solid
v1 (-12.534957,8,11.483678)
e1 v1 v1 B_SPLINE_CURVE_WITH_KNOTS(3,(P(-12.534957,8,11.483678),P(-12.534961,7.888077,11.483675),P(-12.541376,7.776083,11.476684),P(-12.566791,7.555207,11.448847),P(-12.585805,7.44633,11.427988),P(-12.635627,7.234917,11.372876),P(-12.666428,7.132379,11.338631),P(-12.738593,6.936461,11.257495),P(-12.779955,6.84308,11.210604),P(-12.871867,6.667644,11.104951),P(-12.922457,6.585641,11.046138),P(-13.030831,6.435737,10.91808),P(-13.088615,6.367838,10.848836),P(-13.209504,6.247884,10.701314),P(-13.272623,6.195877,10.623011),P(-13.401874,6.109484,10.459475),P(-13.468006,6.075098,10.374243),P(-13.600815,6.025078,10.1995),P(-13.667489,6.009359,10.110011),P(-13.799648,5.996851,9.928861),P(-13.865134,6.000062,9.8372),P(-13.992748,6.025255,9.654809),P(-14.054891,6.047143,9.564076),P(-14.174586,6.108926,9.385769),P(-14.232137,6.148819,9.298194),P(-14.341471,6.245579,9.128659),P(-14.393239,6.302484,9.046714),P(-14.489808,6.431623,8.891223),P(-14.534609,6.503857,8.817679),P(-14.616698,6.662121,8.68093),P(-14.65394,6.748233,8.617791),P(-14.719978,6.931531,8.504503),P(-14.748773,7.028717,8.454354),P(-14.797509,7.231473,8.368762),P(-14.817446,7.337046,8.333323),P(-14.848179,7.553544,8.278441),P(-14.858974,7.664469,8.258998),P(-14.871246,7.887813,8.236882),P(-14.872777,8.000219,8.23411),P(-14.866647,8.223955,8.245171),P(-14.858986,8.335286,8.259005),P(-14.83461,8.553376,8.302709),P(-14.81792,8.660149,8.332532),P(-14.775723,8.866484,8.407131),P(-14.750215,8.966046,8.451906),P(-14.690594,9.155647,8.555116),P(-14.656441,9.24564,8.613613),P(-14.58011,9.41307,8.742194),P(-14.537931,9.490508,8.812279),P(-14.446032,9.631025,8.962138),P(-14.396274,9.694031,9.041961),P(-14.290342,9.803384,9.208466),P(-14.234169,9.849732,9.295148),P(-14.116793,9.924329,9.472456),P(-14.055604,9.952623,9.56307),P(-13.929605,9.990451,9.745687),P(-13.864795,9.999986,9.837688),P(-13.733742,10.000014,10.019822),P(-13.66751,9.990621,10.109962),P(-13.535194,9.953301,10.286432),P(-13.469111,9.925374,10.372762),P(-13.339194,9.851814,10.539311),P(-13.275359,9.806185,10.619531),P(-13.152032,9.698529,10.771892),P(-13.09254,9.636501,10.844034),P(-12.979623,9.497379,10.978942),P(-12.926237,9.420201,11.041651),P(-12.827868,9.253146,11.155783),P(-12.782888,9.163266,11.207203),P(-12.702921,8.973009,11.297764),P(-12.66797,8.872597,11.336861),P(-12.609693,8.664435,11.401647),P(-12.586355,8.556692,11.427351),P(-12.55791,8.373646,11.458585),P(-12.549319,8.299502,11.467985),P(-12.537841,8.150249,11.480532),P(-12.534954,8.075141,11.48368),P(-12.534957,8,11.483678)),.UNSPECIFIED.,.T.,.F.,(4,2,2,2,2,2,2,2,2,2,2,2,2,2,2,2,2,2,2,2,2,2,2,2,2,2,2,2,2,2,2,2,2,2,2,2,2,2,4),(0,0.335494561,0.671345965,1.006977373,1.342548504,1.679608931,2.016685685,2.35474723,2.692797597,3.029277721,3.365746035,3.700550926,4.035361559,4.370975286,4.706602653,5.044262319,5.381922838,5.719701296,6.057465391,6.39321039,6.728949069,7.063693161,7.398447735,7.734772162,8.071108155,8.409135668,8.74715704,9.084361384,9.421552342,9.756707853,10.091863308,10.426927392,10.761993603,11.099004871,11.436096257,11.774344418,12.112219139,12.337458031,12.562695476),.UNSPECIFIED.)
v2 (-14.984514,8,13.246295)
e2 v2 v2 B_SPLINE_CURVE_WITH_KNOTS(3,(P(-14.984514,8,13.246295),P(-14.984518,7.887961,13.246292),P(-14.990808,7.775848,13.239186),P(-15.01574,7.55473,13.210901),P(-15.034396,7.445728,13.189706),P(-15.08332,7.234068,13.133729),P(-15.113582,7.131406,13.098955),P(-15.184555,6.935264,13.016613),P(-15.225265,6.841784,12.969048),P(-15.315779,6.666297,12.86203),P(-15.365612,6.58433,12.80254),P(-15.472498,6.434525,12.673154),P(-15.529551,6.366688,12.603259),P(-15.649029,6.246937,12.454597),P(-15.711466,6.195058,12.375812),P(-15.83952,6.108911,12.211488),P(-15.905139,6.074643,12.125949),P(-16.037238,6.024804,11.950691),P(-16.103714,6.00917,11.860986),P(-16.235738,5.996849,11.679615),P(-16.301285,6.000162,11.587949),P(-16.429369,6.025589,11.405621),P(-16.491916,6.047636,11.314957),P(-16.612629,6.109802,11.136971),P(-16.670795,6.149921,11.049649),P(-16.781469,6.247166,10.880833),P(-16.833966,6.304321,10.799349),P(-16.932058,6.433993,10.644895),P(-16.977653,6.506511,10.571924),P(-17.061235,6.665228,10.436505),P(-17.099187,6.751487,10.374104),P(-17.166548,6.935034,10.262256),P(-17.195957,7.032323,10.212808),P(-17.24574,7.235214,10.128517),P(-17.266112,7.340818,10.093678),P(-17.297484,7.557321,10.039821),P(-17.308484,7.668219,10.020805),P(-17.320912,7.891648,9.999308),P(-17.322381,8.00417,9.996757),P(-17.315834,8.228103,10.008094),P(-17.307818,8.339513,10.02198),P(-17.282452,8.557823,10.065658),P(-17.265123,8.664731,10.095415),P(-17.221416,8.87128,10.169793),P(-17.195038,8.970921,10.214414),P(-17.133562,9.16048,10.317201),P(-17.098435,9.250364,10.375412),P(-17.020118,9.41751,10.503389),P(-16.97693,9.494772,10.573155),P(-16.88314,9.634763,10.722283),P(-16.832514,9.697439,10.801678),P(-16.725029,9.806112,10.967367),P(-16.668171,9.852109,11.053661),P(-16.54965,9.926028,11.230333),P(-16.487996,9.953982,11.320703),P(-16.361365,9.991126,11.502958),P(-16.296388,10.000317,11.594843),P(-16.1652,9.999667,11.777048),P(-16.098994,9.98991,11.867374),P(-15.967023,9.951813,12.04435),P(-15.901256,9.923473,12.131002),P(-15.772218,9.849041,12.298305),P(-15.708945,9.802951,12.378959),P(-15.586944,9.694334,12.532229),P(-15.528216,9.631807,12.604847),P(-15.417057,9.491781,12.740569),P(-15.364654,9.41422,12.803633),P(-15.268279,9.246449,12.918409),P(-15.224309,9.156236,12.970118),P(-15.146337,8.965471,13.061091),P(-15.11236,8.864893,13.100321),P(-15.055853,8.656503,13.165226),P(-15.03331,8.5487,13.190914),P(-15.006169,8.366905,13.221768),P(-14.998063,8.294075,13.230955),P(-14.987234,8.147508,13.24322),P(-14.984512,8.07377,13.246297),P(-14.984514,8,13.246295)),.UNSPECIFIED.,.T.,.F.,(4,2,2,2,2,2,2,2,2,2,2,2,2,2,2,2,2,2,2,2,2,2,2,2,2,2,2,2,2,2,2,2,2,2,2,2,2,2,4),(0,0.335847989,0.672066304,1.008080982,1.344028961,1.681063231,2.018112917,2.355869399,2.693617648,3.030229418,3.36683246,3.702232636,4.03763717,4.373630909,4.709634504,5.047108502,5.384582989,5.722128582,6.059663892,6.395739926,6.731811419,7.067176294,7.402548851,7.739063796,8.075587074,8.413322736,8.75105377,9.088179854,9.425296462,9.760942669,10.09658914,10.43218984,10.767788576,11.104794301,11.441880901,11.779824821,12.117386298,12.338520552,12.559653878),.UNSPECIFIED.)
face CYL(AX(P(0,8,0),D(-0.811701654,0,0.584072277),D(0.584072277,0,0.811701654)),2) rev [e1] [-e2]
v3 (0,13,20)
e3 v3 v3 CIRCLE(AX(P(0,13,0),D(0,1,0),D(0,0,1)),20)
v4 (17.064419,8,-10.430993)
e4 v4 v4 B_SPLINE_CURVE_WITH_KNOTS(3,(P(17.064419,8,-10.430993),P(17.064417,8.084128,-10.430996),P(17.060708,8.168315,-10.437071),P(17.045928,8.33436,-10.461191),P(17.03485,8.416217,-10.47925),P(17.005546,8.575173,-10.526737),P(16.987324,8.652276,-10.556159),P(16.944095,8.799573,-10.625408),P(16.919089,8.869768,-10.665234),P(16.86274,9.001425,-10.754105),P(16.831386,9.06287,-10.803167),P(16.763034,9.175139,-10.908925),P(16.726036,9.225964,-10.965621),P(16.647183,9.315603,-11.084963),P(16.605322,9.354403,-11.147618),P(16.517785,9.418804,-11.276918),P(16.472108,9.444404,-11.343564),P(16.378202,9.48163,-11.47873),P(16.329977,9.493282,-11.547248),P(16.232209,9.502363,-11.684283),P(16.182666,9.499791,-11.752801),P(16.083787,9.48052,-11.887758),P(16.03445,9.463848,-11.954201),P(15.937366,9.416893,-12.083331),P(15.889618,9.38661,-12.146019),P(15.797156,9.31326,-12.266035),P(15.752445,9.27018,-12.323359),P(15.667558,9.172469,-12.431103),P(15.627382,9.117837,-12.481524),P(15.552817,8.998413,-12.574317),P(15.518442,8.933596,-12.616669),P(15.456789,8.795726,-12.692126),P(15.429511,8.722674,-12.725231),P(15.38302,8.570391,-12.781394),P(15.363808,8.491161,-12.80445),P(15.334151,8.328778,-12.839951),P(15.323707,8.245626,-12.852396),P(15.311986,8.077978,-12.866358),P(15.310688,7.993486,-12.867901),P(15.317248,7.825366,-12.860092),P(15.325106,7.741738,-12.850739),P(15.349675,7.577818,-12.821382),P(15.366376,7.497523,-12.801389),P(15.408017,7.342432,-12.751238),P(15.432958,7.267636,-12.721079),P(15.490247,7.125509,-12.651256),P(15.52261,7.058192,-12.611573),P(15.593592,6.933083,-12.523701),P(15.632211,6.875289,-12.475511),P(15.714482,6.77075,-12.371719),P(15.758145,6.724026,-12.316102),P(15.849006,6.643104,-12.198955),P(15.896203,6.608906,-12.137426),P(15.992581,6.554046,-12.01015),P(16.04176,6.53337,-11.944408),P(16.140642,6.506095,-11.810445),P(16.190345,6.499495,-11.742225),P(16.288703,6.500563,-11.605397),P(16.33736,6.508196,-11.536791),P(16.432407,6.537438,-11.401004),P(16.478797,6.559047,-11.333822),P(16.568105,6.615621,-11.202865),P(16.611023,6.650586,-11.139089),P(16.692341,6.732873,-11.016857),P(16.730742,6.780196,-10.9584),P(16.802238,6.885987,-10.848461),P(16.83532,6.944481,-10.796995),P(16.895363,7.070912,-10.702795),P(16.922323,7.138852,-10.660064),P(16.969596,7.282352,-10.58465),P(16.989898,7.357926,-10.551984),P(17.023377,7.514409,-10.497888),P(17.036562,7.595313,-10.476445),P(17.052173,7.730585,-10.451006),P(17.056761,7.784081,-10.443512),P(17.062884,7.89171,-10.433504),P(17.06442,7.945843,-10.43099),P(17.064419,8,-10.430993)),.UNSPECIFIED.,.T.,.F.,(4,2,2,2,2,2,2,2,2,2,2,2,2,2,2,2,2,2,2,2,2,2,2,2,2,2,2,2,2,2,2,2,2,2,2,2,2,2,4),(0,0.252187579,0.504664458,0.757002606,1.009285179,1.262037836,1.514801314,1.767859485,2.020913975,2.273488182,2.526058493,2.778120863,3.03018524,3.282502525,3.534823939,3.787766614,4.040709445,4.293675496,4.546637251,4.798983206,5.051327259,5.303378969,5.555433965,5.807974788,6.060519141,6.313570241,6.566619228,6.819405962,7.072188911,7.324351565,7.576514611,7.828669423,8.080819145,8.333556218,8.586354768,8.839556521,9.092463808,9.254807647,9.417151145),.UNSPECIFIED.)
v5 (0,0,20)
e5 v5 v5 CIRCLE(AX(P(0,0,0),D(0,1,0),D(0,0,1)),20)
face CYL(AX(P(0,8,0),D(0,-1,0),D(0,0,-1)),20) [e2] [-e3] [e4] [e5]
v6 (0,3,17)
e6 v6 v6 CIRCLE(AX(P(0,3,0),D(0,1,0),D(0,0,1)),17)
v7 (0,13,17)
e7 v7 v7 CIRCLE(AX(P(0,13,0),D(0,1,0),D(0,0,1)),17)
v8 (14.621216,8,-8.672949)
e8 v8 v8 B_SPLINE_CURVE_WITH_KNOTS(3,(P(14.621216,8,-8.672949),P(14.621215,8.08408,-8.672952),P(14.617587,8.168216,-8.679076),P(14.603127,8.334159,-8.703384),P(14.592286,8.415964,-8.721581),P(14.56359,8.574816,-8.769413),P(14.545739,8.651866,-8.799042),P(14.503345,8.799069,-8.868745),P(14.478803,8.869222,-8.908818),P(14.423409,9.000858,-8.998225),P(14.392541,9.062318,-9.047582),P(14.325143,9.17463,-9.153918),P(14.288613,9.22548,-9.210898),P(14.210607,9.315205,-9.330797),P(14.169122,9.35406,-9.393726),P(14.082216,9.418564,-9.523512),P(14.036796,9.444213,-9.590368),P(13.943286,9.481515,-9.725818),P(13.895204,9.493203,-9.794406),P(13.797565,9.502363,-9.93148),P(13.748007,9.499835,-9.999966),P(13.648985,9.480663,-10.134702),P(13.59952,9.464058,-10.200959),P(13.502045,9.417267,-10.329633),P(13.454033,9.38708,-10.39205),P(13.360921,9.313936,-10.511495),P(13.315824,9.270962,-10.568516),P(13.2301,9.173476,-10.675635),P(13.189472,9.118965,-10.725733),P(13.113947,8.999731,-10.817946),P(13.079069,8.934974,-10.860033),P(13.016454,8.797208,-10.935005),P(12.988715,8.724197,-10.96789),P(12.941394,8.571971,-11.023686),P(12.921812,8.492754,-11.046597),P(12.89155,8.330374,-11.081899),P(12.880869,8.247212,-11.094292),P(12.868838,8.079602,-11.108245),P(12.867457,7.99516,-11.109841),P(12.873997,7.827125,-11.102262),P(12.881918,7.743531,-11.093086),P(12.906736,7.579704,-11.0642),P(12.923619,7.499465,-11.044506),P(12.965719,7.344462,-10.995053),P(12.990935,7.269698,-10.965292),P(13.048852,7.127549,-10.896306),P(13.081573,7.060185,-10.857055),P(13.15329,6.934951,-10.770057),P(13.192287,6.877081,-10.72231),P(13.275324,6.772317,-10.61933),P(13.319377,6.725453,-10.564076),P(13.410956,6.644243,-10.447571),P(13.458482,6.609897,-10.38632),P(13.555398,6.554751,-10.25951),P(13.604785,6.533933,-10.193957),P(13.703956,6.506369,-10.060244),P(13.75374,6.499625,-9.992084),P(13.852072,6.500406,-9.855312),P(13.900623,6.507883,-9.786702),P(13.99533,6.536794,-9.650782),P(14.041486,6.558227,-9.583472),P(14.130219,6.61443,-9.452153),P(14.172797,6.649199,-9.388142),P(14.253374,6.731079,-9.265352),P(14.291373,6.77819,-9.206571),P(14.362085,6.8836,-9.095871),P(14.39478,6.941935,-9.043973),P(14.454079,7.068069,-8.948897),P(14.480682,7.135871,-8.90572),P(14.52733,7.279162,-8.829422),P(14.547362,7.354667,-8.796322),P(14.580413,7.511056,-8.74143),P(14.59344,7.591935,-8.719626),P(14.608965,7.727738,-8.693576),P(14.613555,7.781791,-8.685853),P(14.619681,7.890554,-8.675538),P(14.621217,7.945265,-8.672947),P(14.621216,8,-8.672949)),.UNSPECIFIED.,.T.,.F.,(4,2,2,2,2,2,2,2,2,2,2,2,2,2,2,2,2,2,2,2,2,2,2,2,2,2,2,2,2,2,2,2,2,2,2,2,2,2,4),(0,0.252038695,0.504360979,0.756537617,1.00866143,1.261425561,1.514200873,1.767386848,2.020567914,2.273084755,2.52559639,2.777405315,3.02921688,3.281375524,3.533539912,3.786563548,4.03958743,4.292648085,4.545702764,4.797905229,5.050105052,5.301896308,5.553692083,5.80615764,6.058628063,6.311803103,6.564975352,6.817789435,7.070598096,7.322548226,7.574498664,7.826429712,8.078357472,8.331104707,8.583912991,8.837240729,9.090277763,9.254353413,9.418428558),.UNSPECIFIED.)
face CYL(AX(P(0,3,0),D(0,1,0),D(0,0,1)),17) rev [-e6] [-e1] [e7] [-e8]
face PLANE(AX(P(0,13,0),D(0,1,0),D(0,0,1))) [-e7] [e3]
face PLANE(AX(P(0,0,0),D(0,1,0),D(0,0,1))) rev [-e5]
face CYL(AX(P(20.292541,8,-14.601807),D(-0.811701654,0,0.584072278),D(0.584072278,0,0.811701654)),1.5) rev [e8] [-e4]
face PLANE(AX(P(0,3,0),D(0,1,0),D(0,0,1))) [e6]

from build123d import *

# Parameters (mm, degrees)
SKETCH1_R              = 20
BOSS_EXTRUDE2_DEPTH    = 8
SKETCH7_R              = 20
BOSS_EXTRUDE3_DEPTH    = 5
CUT_EXTRUDE2_START     = -20.000000091
CUT_EXTRUDE2_OUTLINE_R = 2
CUT_EXTRUDE2_DEPTH     = 20.00000009
SKETCH14_R             = 1.5
CUT_EXTRUDE3_DEPTH     = 25
SKETCH15_R             = 17
CUT_EXTRUDE4_DEPTH     = 10


# Read off the part's stored shape, not the designer's step: Cut-Extrude2
with BuildPart() as part:
    # Sketch1 → Boss-Extrude2 (new body)
    with BuildSketch(Plane(origin=(0, 0, 0), x_dir=(1, 0, 0), z_dir=(0, 1, 0))):
        with Locations(Location((0, 0, 0), (0, 0, 270))):
            Circle(SKETCH1_R)
    extrude(amount=BOSS_EXTRUDE2_DEPTH)

    # Sketch7 → Boss-Extrude3 (add)
    with BuildSketch(Plane(origin=(0, 8, 0), x_dir=(1, 0, 0), z_dir=(0, 1, 0))):
        with Locations(Location((0, 0, 0), (0, 0, 270))):
            Circle(SKETCH7_R)
    extrude(amount=BOSS_EXTRUDE3_DEPTH)

    # Cut-Extrude2 outline → Cut-Extrude2 (cut)
    with BuildSketch(Plane(origin=(0, 0, 0), x_dir=(0.5840722771163888, 0, 0.8117016539986083), z_dir=(0.8117016539986082, 0, -0.5840722771163891)).offset(CUT_EXTRUDE2_START)):
        with Locations((0, -8)):
            Circle(CUT_EXTRUDE2_OUTLINE_R)
    extrude(amount=CUT_EXTRUDE2_DEPTH, mode=Mode.SUBTRACT)

    # Sketch14 → Cut-Extrude3 (cut)
    with BuildSketch(Plane(origin=(0, 0, 0), x_dir=(0.5840722775801191, 0, 0.8117016536649241), z_dir=(-0.8117016536649241, 0, 0.5840722775801191))):
        with Locations((0, 8)):
            Circle(SKETCH14_R)
    extrude(amount=-CUT_EXTRUDE3_DEPTH, mode=Mode.SUBTRACT)

    # Sketch15 → Cut-Extrude4 (cut)
    with BuildSketch(Plane(origin=(0, 13, 0), x_dir=(1, 0, 0), z_dir=(0, 1, 0))):
        with Locations(Location((0, 0, 0), (0, 0, 270))):
            Circle(SKETCH15_R)
    extrude(amount=-CUT_EXTRUDE4_DEPTH, mode=Mode.SUBTRACT)


solid = part.part
